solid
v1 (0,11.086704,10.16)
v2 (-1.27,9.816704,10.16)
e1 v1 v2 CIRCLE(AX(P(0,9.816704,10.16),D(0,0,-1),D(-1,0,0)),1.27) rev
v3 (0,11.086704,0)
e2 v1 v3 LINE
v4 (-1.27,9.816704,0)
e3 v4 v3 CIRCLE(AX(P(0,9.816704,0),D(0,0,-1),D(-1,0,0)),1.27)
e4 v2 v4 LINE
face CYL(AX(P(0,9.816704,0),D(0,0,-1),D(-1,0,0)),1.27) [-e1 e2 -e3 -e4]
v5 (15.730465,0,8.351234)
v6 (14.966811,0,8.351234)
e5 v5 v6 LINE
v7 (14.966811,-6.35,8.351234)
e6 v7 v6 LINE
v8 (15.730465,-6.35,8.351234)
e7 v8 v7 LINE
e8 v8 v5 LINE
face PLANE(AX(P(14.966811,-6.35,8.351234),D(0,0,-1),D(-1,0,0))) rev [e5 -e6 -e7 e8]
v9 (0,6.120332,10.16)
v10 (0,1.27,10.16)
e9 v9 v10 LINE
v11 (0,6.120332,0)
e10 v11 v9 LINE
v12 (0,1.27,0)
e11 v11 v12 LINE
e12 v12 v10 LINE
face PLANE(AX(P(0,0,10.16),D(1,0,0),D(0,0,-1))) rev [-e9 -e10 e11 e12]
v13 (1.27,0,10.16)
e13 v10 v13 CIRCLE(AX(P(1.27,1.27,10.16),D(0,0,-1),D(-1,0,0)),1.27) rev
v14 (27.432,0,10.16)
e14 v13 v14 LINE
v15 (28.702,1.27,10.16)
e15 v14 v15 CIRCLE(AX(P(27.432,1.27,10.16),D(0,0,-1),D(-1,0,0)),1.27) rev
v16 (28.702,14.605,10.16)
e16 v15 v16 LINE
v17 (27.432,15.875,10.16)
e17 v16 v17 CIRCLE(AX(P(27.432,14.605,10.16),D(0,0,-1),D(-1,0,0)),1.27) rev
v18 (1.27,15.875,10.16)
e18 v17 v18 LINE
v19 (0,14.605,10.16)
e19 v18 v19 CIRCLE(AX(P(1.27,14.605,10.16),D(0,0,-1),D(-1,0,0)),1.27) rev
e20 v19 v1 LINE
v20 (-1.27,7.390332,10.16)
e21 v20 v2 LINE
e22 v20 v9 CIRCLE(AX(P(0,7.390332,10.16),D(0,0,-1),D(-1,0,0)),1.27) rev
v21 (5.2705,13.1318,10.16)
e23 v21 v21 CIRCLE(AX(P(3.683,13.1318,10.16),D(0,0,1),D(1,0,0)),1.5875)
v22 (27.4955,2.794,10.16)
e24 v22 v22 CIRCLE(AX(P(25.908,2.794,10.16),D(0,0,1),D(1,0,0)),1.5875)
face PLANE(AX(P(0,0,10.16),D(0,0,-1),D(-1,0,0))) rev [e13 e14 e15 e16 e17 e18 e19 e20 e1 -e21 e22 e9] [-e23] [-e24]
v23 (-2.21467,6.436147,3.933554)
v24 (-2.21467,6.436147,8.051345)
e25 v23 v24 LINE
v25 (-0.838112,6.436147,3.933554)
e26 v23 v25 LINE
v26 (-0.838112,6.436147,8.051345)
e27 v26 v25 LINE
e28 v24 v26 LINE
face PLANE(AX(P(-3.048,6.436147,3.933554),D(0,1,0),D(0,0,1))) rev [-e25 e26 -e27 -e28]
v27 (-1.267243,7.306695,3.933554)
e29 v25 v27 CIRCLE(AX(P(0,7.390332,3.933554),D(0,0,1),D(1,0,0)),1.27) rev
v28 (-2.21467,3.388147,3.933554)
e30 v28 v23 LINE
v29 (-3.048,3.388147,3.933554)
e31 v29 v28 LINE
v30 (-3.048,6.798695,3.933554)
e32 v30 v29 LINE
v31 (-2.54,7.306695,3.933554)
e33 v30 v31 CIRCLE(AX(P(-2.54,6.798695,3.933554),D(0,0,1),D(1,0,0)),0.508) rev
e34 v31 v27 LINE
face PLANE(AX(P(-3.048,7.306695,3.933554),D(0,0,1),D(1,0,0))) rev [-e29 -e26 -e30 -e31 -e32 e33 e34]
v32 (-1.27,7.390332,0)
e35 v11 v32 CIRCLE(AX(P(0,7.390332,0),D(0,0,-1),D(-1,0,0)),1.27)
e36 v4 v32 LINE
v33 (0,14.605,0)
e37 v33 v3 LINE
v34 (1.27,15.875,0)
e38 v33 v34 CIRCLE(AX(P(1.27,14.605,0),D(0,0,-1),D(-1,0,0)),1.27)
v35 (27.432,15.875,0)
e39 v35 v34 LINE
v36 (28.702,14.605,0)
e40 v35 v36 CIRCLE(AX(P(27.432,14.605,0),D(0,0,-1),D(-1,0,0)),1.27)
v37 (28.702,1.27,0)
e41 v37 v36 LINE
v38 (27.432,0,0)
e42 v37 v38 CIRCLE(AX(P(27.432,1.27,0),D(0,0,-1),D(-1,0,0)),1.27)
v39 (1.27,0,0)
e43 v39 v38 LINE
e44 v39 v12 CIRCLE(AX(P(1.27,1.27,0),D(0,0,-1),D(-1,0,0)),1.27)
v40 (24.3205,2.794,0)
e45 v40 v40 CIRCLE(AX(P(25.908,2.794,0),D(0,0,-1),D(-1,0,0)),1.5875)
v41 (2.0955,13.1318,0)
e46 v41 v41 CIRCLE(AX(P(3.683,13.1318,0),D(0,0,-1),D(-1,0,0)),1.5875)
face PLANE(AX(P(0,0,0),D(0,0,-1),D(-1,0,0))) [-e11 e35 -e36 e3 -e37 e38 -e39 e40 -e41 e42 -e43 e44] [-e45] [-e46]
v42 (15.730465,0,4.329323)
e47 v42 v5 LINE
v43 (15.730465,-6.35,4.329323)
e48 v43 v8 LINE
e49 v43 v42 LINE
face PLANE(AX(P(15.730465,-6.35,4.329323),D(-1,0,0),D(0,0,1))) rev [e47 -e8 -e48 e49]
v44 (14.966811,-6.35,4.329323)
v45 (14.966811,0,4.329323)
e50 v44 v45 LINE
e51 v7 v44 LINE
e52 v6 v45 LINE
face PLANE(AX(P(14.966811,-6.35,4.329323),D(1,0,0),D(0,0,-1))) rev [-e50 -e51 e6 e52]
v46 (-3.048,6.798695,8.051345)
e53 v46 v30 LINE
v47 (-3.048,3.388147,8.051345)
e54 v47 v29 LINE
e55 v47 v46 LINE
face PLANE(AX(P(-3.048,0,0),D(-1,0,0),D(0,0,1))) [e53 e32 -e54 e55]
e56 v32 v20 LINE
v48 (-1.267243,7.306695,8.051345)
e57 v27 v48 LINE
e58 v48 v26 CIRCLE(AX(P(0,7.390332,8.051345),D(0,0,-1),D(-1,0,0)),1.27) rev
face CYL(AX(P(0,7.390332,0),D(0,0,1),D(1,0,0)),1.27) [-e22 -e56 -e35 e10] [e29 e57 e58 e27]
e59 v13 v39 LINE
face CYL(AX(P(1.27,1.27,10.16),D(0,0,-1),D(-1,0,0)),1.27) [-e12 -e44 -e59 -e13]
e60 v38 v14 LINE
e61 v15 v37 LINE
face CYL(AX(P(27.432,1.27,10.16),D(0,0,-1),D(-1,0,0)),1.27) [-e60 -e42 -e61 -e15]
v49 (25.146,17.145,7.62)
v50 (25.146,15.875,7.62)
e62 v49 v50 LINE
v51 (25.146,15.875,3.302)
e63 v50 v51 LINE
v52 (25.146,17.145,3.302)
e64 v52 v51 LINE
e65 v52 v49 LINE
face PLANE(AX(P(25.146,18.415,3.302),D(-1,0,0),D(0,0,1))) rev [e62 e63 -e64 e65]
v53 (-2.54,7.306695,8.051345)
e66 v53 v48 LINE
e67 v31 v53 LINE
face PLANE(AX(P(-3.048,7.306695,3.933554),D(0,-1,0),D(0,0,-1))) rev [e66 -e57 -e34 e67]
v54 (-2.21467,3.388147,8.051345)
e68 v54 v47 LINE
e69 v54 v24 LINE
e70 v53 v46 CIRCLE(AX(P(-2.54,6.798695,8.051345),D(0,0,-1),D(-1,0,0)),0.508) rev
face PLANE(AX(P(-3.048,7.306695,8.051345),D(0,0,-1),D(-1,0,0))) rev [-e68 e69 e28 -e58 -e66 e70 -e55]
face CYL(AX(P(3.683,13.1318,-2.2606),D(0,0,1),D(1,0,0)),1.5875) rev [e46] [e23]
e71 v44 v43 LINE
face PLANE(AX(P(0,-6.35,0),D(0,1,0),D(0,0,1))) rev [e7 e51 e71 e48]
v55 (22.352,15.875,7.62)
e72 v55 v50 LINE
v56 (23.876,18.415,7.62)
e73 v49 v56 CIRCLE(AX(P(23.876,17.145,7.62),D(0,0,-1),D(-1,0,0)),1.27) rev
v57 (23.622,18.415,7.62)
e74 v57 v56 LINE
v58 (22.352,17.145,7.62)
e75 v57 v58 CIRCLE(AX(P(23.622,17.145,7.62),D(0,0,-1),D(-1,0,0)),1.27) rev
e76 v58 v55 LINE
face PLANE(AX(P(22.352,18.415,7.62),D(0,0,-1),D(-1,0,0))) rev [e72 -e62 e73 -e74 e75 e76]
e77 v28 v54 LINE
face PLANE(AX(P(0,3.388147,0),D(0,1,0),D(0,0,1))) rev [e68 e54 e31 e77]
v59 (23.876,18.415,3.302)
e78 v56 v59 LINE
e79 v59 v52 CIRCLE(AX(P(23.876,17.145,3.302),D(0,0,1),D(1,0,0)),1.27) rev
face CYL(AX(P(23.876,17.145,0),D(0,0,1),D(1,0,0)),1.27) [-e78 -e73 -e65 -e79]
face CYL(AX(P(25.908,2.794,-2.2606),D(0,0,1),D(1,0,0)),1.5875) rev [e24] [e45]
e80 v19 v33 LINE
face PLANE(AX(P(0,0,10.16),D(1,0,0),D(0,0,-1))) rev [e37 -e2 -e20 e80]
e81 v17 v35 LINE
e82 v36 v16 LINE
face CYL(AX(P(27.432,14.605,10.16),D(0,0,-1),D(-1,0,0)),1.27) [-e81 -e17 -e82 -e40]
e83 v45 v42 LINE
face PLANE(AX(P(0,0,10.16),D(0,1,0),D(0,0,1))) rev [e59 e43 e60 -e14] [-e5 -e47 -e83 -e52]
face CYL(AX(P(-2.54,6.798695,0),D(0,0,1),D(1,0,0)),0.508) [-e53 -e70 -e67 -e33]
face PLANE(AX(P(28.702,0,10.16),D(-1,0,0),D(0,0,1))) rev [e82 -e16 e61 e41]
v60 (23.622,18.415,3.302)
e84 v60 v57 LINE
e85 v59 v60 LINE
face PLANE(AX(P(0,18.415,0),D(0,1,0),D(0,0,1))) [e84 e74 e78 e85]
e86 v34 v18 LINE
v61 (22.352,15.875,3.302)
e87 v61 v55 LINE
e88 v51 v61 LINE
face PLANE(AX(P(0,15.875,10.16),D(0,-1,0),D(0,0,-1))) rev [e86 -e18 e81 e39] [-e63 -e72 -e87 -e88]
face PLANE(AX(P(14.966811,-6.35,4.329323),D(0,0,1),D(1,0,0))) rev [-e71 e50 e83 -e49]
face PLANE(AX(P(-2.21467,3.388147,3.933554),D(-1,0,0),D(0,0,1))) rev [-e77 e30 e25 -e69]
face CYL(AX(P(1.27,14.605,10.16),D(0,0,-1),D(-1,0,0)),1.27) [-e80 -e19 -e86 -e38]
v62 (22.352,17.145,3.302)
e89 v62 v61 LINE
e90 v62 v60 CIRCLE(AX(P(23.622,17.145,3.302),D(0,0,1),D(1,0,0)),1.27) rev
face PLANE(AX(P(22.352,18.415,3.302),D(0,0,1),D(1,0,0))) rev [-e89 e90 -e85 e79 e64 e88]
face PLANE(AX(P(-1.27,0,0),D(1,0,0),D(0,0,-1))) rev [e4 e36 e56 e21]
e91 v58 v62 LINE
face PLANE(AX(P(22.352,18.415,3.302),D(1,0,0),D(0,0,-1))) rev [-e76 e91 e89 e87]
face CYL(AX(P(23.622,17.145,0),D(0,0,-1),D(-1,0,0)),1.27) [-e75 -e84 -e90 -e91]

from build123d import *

# Parameters (mm, degrees)
SKETCH1_W           = 28.702
SKETCH1_H           = 15.875
BOSS_EXTRUDE1_DEPTH = 10.16
SKETCH2_R           = 1.5875
CUT_EXTRUDE1_DEPTH  = 12.4206
SKETCH4_W           = 0.763653933
SKETCH4_H           = 4.021910712
BOSS_EXTRUDE2_DEPTH = 6.35
SKETCH5_W           = 4.11779101
SKETCH5_H           = 0.870547728
BOSS_EXTRUDE3_DEPTH = 3.048
SKETCH6_W           = 0.83333033
SKETCH6_H           = 4.11779101
BOSS_EXTRUDE4_DEPTH = 3.048
FILLET1_R           = 0.508
SKETCH7_W           = 10.16
SKETCH7_H           = 4.966371196
BOSS_EXTRUDE5_DEPTH = 1.27
SKETCH8_W           = 2.794
SKETCH8_H           = 4.318
BOSS_EXTRUDE6_DEPTH = 2.54
FILLET3_R           = 1.27
FILLET5_R           = 1.27
FILLET6_R           = 1.27


with BuildPart() as part:
    # Sketch1 → Boss-Extrude1 (new body)
    with BuildSketch(Plane.XY):
        with Locations((14.351, 7.9375)):
            Rectangle(SKETCH1_W, SKETCH1_H)
    extrude(amount=BOSS_EXTRUDE1_DEPTH)

    # Sketch2 → Cut-Extrude1 (cut)
    with BuildSketch(Plane.XY.offset(10.16)):
        with Locations((3.683, 13.1318)):
            Circle(SKETCH2_R)
        with Locations((25.908, 2.794)):
            Circle(SKETCH2_R)
    extrude(amount=-CUT_EXTRUDE1_DEPTH, mode=Mode.SUBTRACT)

    # Sketch4 → Boss-Extrude2 (add)
    with BuildSketch(Plane(origin=(0, 0, 0), x_dir=(-1, 0, 0), z_dir=(0, -1, 0))):
        with Locations((-15.348638273, -6.340278275)):
            Rectangle(SKETCH4_W, SKETCH4_H)
    extrude(amount=BOSS_EXTRUDE2_DEPTH)

    # Sketch5 → Boss-Extrude3 (add)
    with BuildSketch(Plane.ZY):
        with Locations((5.992449892, 6.871421324)):
            Rectangle(SKETCH5_W, SKETCH5_H)
    extrude(amount=BOSS_EXTRUDE3_DEPTH)

    # Sketch6 → Boss-Extrude4 (add)
    with BuildSketch(Plane(origin=(0, 6.43614746, 0), x_dir=(-1, 0, 0), z_dir=(0, -1, 0))):
        with Locations((2.631334835, -5.992449892)):
            Rectangle(SKETCH6_W, SKETCH6_H)
    extrude(amount=BOSS_EXTRUDE4_DEPTH)

    # Fillet1
    fillet1_edges = [part.edges().sort_by_distance(p)[0] for p in [
        (-3.048, 7.306695188, 5.992449892),
    ]]
    fillet(fillet1_edges, radius=FILLET1_R)

    # Sketch7 → Boss-Extrude5 (add)
    with BuildSketch(Plane.ZY):
        with Locations((5.08, 8.603517934)):
            Rectangle(SKETCH7_W, SKETCH7_H)
    extrude(amount=BOSS_EXTRUDE5_DEPTH)

    # Sketch8 → Boss-Extrude6 (add)
    with BuildSketch(Plane(origin=(0, 15.875, 0), x_dir=(1, 0, 0), z_dir=(0, 1, 0))):
        with Locations((23.749, -5.461)):
            Rectangle(SKETCH8_W, SKETCH8_H)
    extrude(amount=BOSS_EXTRUDE6_DEPTH)

    # Fillet3
    fillet3_edges = [part.edges().sort_by_distance(p)[0] for p in [
        (22.352, 18.415, 5.461),
        (25.146, 18.415, 5.461),
    ]]
    fillet(fillet3_edges, radius=FILLET3_R)

    # Fillet5
    fillet5_edges = [part.edges().sort_by_distance(p)[0] for p in [
        (0, 15.875, 5.08),
        (28.702, 15.875, 5.08),
        (28.702, 0, 5.08),
        (0, 0, 5.08),
    ]]
    fillet(fillet5_edges, radius=FILLET5_R)

    # Fillet6
    # the kernel refuses this fillet: 1.27 mm, written as the material it takes off along each edge
    with BuildSketch(Plane(origin=(-1.27, 6.120332336, -3.175), x_dir=(1, 0, 0), z_dir=(0, 0, 1))) as fillet6_piece_1_section:
        with BuildLine():
            CenterArc((FILLET6_R, FILLET6_R), FILLET6_R, 180, 90)
            Line((0, FILLET6_R), (0, 0))
            Line((0, 0), (FILLET6_R, 0))
        make_face()
    fillet6_piece_1 = extrude(amount=16.51, mode=Mode.PRIVATE)
    fillet6_piece_1 = split(fillet6_piece_1, bisect_by=Plane(origin=(-0.894827344, 6.253367253, 3.933554387), z_dir=(0, 0, -1)), keep=Keep.TOP, mode=Mode.PRIVATE)
    add(fillet6_piece_1, mode=Mode.SUBTRACT)
    with BuildSketch(Plane(origin=(-1.27, 6.120332336, -3.175), x_dir=(1, 0, 0), z_dir=(0, 0, 1))) as fillet6_piece_2_section:
        with BuildLine():
            CenterArc((FILLET6_R, FILLET6_R), FILLET6_R, 180, 90)
            Line((0, FILLET6_R), (0, 0))
            Line((0, 0), (FILLET6_R, 0))
        make_face()
    fillet6_piece_2 = extrude(amount=16.51, mode=Mode.PRIVATE)
    fillet6_piece_2 = split(fillet6_piece_2, bisect_by=Plane(origin=(-0.894827344, 6.43614746, 5.992449892), z_dir=(0, -1, 0)), keep=Keep.TOP, mode=Mode.PRIVATE)
    add(fillet6_piece_2, mode=Mode.SUBTRACT)
    with BuildSketch(Plane(origin=(-1.27, 6.120332336, -3.175), x_dir=(1, 0, 0), z_dir=(0, 0, 1))) as fillet6_piece_3_section:
        with BuildLine():
            CenterArc((FILLET6_R, FILLET6_R), FILLET6_R, 180, 90)
            Line((0, FILLET6_R), (0, 0))
            Line((0, 0), (FILLET6_R, 0))
        make_face()
    fillet6_piece_3 = extrude(amount=16.51, mode=Mode.PRIVATE)
    fillet6_piece_3 = split(fillet6_piece_3, bisect_by=Plane(origin=(-1.269173055, 7.306695188, 5.992449892), z_dir=(0, 1, 0)), keep=Keep.TOP, mode=Mode.PRIVATE)
    add(fillet6_piece_3, mode=Mode.SUBTRACT)
    with BuildSketch(Plane(origin=(-1.27, 6.120332336, -3.175), x_dir=(1, 0, 0), z_dir=(0, 0, 1))) as fillet6_piece_4_section:
        with BuildLine():
            CenterArc((FILLET6_R, FILLET6_R), FILLET6_R, 180, 90)
            Line((0, FILLET6_R), (0, 0))
            Line((0, 0), (FILLET6_R, 0))
        make_face()
    fillet6_piece_4 = extrude(amount=16.51, mode=Mode.PRIVATE)
    fillet6_piece_4 = split(fillet6_piece_4, bisect_by=Plane(origin=(-1.145263538, 6.665418953, 8.051345397), z_dir=(0, 0, 1)), keep=Keep.TOP, mode=Mode.PRIVATE)
    add(fillet6_piece_4, mode=Mode.SUBTRACT)
    with BuildSketch(Plane(origin=(-1.27, 11.086703532, 13.335), x_dir=(0, -1, 0), z_dir=(0, 0, -1))) as fillet6_piece_5:
        with BuildLine():
            CenterArc((FILLET6_R, -FILLET6_R), FILLET6_R, 90, 90)
            Line((0, -FILLET6_R), (0, 0))
            Line((0, 0), (FILLET6_R, 0))
        make_face()
    extrude(amount=16.51, mode=Mode.SUBTRACT)


solid = part.part
